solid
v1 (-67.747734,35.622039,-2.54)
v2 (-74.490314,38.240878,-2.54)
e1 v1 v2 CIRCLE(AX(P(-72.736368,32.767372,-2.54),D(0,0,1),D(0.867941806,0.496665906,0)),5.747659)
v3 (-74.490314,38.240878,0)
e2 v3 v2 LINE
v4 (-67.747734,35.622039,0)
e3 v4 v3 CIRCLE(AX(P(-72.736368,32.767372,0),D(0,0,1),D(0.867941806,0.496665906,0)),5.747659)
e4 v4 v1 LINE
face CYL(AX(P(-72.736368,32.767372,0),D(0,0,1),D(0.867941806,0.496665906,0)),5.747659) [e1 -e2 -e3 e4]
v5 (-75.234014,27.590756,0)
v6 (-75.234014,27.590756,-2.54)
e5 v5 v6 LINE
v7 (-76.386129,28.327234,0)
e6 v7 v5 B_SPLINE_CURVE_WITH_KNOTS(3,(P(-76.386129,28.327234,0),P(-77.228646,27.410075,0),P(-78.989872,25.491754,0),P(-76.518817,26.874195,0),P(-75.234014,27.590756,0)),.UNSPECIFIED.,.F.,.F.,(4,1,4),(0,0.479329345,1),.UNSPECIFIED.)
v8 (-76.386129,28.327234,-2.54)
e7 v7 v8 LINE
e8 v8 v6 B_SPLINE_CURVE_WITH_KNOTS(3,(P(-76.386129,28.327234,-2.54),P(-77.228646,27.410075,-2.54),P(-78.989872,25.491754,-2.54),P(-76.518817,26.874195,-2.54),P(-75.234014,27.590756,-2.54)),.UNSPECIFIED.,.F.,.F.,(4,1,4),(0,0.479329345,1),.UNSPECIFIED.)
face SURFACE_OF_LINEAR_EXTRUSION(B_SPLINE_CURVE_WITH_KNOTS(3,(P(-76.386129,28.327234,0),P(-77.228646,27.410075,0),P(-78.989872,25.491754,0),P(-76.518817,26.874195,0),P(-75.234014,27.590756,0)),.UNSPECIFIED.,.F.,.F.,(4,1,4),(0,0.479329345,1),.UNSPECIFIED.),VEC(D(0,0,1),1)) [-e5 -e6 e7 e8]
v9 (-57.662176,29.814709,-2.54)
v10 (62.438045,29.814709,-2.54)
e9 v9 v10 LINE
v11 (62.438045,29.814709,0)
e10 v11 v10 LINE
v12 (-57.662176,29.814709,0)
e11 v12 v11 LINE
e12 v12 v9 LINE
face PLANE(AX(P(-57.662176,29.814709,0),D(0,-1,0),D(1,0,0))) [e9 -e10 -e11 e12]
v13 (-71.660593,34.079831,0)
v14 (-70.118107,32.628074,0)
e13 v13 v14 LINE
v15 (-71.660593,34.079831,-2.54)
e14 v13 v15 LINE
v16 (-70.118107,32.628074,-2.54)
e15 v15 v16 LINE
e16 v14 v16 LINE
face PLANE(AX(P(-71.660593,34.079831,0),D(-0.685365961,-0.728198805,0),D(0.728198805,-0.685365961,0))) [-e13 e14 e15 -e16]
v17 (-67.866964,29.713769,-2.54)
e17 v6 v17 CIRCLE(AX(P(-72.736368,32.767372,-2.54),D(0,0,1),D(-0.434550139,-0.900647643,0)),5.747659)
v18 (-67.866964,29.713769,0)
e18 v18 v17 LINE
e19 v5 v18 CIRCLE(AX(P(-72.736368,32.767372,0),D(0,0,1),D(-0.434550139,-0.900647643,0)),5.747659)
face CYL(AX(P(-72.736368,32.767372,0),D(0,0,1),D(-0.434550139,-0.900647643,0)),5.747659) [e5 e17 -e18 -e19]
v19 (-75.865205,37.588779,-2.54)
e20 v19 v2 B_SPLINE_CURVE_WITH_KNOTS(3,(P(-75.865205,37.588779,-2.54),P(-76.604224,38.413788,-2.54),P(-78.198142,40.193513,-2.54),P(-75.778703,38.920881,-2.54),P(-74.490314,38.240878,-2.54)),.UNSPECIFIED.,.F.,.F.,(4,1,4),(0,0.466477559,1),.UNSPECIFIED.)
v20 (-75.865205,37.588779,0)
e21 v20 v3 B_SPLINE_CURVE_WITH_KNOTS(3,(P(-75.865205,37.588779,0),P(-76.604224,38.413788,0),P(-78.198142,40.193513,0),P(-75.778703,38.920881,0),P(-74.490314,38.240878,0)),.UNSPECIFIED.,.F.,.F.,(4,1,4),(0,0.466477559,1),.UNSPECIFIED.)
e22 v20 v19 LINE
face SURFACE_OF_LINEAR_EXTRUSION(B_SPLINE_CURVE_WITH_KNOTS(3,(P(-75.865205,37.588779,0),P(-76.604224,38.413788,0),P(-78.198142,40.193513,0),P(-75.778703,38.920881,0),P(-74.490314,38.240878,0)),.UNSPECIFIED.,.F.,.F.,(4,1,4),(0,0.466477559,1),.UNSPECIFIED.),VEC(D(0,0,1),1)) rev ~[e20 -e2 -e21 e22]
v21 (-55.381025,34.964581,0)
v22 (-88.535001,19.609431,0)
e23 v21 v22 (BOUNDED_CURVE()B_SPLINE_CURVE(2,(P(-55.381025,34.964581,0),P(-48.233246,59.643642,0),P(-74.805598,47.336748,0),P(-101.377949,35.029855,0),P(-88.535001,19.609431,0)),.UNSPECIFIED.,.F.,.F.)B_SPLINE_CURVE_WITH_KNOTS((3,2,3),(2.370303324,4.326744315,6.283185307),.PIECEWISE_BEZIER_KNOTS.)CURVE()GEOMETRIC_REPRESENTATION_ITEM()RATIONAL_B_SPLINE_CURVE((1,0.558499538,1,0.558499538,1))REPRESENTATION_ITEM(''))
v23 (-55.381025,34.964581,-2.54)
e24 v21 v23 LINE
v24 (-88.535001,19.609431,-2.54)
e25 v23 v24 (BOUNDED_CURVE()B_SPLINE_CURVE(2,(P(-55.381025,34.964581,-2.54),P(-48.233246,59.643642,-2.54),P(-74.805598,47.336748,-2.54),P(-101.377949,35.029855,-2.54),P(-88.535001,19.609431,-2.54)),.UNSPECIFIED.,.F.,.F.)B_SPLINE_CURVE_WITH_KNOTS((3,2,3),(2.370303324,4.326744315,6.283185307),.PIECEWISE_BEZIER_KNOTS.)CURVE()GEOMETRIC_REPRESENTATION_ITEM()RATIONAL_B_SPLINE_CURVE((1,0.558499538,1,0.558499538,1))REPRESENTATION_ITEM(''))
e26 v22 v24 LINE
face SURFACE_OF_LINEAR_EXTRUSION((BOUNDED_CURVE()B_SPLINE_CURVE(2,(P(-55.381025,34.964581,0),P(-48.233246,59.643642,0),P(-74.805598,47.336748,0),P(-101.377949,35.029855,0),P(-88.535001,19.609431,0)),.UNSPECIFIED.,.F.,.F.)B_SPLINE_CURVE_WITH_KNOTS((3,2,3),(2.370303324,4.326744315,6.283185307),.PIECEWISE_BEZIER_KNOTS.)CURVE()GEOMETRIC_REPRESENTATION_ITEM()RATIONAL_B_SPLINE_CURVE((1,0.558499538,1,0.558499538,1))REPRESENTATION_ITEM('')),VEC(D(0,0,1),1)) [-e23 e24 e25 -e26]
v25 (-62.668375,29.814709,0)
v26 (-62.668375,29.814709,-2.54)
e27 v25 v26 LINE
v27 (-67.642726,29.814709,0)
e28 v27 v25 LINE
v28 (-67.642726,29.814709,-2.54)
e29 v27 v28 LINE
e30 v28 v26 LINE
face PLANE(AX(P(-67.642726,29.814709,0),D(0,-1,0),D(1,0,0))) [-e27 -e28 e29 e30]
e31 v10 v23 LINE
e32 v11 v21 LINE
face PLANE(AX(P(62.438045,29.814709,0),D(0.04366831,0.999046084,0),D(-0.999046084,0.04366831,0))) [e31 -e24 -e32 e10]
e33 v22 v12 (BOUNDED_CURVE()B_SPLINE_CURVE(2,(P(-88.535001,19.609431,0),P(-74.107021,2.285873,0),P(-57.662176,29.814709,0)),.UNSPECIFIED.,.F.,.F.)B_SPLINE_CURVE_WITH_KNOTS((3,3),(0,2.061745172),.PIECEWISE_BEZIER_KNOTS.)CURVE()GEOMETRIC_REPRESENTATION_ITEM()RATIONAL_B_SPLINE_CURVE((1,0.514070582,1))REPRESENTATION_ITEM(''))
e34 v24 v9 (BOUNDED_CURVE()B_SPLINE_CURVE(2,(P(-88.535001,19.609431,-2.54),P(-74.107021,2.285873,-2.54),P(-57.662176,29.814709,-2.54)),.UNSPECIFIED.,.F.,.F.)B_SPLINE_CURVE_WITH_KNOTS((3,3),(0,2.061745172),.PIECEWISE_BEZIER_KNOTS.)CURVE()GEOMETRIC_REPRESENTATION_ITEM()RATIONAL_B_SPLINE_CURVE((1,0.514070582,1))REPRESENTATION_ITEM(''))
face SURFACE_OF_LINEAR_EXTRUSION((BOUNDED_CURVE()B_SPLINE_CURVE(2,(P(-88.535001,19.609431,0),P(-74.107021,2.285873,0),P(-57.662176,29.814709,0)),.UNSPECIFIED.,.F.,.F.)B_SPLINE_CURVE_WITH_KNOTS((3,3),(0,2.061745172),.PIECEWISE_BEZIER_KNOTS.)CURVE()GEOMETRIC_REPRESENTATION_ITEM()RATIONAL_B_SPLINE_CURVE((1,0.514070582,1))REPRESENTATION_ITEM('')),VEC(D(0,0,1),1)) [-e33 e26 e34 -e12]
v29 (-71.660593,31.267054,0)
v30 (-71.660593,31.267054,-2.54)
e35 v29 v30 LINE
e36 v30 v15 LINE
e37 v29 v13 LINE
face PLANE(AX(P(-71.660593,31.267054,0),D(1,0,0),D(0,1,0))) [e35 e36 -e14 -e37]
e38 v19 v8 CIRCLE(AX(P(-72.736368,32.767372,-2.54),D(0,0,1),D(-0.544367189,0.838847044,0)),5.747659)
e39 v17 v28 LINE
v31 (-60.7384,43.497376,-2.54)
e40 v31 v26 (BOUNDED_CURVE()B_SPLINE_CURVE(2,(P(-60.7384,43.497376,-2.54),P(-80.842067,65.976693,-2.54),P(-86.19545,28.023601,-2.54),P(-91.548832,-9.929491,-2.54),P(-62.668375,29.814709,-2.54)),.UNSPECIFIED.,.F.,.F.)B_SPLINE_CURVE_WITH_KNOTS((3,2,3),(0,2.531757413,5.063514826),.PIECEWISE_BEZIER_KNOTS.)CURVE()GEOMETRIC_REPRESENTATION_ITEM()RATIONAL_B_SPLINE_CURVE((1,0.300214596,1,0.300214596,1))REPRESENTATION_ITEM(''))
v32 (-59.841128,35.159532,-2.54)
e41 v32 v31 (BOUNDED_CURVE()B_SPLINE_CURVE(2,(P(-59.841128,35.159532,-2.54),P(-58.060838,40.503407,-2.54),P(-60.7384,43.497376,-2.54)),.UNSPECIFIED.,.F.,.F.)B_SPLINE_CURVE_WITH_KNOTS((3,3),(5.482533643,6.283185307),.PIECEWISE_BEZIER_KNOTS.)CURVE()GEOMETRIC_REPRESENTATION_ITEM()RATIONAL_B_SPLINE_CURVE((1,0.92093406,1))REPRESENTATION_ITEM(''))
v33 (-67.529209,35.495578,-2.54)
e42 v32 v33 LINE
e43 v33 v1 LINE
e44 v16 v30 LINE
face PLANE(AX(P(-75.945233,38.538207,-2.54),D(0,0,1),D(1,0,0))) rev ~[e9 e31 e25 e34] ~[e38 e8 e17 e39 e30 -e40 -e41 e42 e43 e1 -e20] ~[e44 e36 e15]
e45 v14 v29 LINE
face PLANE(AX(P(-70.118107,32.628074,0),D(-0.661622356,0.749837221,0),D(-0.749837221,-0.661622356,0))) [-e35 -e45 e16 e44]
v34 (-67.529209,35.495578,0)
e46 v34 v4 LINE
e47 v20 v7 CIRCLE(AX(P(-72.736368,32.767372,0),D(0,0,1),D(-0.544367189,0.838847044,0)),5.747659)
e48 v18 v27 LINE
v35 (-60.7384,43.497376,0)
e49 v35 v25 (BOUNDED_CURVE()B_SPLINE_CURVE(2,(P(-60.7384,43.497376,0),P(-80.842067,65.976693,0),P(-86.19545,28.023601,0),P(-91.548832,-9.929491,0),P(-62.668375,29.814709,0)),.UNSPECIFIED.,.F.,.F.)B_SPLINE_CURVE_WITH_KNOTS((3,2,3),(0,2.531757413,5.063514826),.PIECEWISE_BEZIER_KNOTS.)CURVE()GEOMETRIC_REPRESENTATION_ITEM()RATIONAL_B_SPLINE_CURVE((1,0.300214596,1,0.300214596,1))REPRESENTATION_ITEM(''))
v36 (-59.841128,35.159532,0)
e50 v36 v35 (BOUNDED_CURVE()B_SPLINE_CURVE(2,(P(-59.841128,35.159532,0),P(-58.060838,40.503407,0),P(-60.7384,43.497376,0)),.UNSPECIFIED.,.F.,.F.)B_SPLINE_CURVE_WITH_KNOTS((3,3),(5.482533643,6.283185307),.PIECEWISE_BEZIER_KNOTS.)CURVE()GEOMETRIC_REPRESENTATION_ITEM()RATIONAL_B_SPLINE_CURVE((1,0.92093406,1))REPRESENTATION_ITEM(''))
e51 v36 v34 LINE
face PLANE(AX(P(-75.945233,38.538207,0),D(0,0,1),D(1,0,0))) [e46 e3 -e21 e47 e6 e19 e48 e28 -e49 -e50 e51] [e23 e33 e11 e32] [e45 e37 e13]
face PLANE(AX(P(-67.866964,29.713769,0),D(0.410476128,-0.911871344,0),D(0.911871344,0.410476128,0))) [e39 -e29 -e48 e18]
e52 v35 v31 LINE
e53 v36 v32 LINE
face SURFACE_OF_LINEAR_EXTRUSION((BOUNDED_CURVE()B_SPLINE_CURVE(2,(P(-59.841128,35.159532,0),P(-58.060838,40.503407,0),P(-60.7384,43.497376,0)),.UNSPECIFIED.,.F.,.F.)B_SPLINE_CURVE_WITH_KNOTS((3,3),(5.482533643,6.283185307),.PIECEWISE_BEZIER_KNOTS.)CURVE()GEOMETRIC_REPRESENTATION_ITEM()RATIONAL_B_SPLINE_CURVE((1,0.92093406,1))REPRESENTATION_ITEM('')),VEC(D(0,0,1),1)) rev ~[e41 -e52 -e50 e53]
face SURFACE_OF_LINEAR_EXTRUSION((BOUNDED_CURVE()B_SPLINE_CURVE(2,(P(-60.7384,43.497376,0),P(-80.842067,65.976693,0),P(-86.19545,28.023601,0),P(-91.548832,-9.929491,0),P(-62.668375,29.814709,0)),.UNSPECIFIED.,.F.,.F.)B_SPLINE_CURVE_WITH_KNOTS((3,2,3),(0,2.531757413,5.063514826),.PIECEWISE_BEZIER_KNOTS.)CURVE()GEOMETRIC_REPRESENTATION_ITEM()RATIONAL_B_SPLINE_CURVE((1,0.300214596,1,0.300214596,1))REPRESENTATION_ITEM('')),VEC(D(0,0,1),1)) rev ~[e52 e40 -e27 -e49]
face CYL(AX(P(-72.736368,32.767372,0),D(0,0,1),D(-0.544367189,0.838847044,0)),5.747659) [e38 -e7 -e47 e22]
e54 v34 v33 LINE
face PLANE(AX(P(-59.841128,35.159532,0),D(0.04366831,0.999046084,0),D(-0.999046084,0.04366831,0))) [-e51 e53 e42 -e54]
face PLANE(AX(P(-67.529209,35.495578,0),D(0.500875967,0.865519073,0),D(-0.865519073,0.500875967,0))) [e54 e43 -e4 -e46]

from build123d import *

# Parameters (mm, degrees)
F1_DEPTH = 2.54


# Not quite as in the source:
# - a feature names something its author has since deleted; it is built from what else it names


with BuildPart() as f1:
    # F0 (on Top) → F1 (new body)
    with BuildSketch(Plane.XY):
        with BuildLine():
            ThreePointArc((-75.8652047354, 37.588779241), (-75.1994350162, 37.9605298718), (-74.4903137067, 38.240877547))
            add(Edge.make_bspline(
                [(-75.8652047354, 37.588779241), (-76.604224067, 38.4137884205), (-78.1981423403, 40.1935134784), (-75.778702664, 38.920881298), (-74.4903137067, 38.240877547)],
                knots=[0, 0, 0, 0, 0.4664775591, 1, 1, 1, 1], degree=3))
        make_face()
        with BuildLine():
            add(Edge.make_bspline(
                [(-76.3861294689, 28.3272341561), (-77.2286455281, 27.4100753254), (-78.989872456, 25.4917535729), (-76.5188170846, 26.874194918), (-75.2340137405, 27.5907563812)],
                knots=[0, 0, 0, 0, 0.4793293454, 1, 1, 1, 1], degree=3))
            ThreePointArc((-75.2340137405, 27.5907563812), (-75.8320510764, 27.9246114815), (-76.3861294689, 28.3272341561))
        make_face()
        with BuildLine():
            Line((-59.8411278552, 35.1595323087), (-55.3810254851, 34.9645812086))
            add(Edge.make_bspline(
                [(-55.3810254851, 34.9645812086), (-48.2332464618, 59.6436415888), (-74.8055976533, 47.3367482699), (-101.3779488448, 35.029854951), (-88.5350008625, 19.6094312212)],
                knots=[2.3703033236, 2.3703033236, 2.3703033236, 4.3267443154, 4.3267443154, 6.2831853072, 6.2831853072, 6.2831853072], degree=2, weights=[1, 0.5584995375, 1, 0.5584995375, 1]))
            add(Edge.make_bspline(
                [(-88.5350008625, 19.6094312212), (-74.1070210535, 2.2858726015), (-57.6621755507, 29.8147089779)],
                knots=[0, 0, 0, 2.061745172, 2.061745172, 2.061745172], degree=2, weights=[1, 0.514070582, 1]))
            Line((-57.6621755507, 29.8147089779), (-62.6683754349, 29.8147089779))
            add(Edge.make_bspline(
                [(-60.7383996248, 43.4973761439), (-80.8420671588, 65.9766930493), (-86.1954495571, 28.0236010013), (-91.5488319555, -9.9294910468), (-62.6683754349, 29.8147089779)],
                knots=[0, 0, 0, 2.5317574132, 2.5317574132, 5.0635148264, 5.0635148264, 5.0635148264], degree=2, weights=[1, 0.3002145965, 1, 0.3002145965, 1]))
            add(Edge.make_bspline(
                [(-59.8411278552, 35.1595323087), (-58.0608375325, 40.5034066751), (-60.7383996248, 43.4973761439)],
                knots=[5.4825336434, 5.4825336434, 5.4825336434, 6.2831853072, 6.2831853072, 6.2831853072], degree=2, weights=[1, 0.9209340602, 1]))
        make_face()
        with BuildLine():
            add(Edge.make_bspline(
                [(-57.6621755507, 29.8147089779), (-56.1294482804, 32.3805098074), (-55.3810254851, 34.9645812086)],
                knots=[2.061745172, 2.061745172, 2.061745172, 2.3703033236, 2.3703033236, 2.3703033236], degree=2, weights=[1, 0.9881225704, 1]))
            Line((-55.3810254851, 34.9645812086), (-59.8411278552, 35.1595323087))
            add(Edge.make_bspline(
                [(-62.6683754349, 29.8147089779), (-60.7356522323, 32.4744500905), (-59.8411278552, 35.1595323087)],
                knots=[5.0635148264, 5.0635148264, 5.0635148264, 5.4825336434, 5.4825336434, 5.4825336434], degree=2, weights=[1, 0.9781330657, 1]))
            Line((-62.6683754349, 29.8147089779), (-57.6621755507, 29.8147089779))
        make_face()
        with BuildLine():
            Line((-57.6621755507, 29.8147089779), (62.438044697, 29.8147089779))
            Line((62.438044697, 29.8147089779), (-55.3810254851, 34.9645812086))
            add(Edge.make_bspline(
                [(-57.6621755507, 29.8147089779), (-56.1294482804, 32.3805098074), (-55.3810254851, 34.9645812086)],
                knots=[2.061745172, 2.061745172, 2.061745172, 2.3703033236, 2.3703033236, 2.3703033236], degree=2, weights=[1, 0.9881225704, 1]))
        make_face()
        with BuildLine():
            add(Edge.make_bspline(
                [(-62.6683754349, 29.8147089779), (-60.7356522323, 32.4744500905), (-59.8411278552, 35.1595323087)],
                knots=[5.0635148264, 5.0635148264, 5.0635148264, 5.4825336434, 5.4825336434, 5.4825336434], degree=2, weights=[1, 0.9781330657, 1]))
            Line((-59.8411278552, 35.1595323087), (-67.5292090986, 35.4955783838))
            Line((-67.5292090986, 35.4955783838), (-67.74773377, 35.6220386313))
            ThreePointArc((-67.74773377, 35.6220386313), (-70.6554109693, 38.1250962836), (-74.4903137067, 38.240877547))
            ThreePointArc((-74.4903137067, 38.240877547), (-75.1994350162, 37.9605298718), (-75.8652047354, 37.588779241))
            ThreePointArc((-75.8652047354, 37.588779241), (-78.4749567451, 33.0901448105), (-76.3861294689, 28.3272341561))
            ThreePointArc((-76.3861294689, 28.3272341561), (-75.8320510764, 27.9246114815), (-75.2340137405, 27.5907563812))
            ThreePointArc((-75.2340137405, 27.5907563812), (-71.1447945546, 27.2444669), (-67.8669635062, 29.7137691443))
            Line((-67.8669635062, 29.7137691443), (-67.6427260041, 29.8147089779))
            Line((-67.6427260041, 29.8147089779), (-62.6683754349, 29.8147089779))
        make_face()
        Polygon((-70.1181069016, 32.6280742884), (-71.660593152, 31.267054379), (-71.660593152, 34.0798310935), align=None, mode=Mode.SUBTRACT)
    extrude(amount=-F1_DEPTH)


solid = f1.part
